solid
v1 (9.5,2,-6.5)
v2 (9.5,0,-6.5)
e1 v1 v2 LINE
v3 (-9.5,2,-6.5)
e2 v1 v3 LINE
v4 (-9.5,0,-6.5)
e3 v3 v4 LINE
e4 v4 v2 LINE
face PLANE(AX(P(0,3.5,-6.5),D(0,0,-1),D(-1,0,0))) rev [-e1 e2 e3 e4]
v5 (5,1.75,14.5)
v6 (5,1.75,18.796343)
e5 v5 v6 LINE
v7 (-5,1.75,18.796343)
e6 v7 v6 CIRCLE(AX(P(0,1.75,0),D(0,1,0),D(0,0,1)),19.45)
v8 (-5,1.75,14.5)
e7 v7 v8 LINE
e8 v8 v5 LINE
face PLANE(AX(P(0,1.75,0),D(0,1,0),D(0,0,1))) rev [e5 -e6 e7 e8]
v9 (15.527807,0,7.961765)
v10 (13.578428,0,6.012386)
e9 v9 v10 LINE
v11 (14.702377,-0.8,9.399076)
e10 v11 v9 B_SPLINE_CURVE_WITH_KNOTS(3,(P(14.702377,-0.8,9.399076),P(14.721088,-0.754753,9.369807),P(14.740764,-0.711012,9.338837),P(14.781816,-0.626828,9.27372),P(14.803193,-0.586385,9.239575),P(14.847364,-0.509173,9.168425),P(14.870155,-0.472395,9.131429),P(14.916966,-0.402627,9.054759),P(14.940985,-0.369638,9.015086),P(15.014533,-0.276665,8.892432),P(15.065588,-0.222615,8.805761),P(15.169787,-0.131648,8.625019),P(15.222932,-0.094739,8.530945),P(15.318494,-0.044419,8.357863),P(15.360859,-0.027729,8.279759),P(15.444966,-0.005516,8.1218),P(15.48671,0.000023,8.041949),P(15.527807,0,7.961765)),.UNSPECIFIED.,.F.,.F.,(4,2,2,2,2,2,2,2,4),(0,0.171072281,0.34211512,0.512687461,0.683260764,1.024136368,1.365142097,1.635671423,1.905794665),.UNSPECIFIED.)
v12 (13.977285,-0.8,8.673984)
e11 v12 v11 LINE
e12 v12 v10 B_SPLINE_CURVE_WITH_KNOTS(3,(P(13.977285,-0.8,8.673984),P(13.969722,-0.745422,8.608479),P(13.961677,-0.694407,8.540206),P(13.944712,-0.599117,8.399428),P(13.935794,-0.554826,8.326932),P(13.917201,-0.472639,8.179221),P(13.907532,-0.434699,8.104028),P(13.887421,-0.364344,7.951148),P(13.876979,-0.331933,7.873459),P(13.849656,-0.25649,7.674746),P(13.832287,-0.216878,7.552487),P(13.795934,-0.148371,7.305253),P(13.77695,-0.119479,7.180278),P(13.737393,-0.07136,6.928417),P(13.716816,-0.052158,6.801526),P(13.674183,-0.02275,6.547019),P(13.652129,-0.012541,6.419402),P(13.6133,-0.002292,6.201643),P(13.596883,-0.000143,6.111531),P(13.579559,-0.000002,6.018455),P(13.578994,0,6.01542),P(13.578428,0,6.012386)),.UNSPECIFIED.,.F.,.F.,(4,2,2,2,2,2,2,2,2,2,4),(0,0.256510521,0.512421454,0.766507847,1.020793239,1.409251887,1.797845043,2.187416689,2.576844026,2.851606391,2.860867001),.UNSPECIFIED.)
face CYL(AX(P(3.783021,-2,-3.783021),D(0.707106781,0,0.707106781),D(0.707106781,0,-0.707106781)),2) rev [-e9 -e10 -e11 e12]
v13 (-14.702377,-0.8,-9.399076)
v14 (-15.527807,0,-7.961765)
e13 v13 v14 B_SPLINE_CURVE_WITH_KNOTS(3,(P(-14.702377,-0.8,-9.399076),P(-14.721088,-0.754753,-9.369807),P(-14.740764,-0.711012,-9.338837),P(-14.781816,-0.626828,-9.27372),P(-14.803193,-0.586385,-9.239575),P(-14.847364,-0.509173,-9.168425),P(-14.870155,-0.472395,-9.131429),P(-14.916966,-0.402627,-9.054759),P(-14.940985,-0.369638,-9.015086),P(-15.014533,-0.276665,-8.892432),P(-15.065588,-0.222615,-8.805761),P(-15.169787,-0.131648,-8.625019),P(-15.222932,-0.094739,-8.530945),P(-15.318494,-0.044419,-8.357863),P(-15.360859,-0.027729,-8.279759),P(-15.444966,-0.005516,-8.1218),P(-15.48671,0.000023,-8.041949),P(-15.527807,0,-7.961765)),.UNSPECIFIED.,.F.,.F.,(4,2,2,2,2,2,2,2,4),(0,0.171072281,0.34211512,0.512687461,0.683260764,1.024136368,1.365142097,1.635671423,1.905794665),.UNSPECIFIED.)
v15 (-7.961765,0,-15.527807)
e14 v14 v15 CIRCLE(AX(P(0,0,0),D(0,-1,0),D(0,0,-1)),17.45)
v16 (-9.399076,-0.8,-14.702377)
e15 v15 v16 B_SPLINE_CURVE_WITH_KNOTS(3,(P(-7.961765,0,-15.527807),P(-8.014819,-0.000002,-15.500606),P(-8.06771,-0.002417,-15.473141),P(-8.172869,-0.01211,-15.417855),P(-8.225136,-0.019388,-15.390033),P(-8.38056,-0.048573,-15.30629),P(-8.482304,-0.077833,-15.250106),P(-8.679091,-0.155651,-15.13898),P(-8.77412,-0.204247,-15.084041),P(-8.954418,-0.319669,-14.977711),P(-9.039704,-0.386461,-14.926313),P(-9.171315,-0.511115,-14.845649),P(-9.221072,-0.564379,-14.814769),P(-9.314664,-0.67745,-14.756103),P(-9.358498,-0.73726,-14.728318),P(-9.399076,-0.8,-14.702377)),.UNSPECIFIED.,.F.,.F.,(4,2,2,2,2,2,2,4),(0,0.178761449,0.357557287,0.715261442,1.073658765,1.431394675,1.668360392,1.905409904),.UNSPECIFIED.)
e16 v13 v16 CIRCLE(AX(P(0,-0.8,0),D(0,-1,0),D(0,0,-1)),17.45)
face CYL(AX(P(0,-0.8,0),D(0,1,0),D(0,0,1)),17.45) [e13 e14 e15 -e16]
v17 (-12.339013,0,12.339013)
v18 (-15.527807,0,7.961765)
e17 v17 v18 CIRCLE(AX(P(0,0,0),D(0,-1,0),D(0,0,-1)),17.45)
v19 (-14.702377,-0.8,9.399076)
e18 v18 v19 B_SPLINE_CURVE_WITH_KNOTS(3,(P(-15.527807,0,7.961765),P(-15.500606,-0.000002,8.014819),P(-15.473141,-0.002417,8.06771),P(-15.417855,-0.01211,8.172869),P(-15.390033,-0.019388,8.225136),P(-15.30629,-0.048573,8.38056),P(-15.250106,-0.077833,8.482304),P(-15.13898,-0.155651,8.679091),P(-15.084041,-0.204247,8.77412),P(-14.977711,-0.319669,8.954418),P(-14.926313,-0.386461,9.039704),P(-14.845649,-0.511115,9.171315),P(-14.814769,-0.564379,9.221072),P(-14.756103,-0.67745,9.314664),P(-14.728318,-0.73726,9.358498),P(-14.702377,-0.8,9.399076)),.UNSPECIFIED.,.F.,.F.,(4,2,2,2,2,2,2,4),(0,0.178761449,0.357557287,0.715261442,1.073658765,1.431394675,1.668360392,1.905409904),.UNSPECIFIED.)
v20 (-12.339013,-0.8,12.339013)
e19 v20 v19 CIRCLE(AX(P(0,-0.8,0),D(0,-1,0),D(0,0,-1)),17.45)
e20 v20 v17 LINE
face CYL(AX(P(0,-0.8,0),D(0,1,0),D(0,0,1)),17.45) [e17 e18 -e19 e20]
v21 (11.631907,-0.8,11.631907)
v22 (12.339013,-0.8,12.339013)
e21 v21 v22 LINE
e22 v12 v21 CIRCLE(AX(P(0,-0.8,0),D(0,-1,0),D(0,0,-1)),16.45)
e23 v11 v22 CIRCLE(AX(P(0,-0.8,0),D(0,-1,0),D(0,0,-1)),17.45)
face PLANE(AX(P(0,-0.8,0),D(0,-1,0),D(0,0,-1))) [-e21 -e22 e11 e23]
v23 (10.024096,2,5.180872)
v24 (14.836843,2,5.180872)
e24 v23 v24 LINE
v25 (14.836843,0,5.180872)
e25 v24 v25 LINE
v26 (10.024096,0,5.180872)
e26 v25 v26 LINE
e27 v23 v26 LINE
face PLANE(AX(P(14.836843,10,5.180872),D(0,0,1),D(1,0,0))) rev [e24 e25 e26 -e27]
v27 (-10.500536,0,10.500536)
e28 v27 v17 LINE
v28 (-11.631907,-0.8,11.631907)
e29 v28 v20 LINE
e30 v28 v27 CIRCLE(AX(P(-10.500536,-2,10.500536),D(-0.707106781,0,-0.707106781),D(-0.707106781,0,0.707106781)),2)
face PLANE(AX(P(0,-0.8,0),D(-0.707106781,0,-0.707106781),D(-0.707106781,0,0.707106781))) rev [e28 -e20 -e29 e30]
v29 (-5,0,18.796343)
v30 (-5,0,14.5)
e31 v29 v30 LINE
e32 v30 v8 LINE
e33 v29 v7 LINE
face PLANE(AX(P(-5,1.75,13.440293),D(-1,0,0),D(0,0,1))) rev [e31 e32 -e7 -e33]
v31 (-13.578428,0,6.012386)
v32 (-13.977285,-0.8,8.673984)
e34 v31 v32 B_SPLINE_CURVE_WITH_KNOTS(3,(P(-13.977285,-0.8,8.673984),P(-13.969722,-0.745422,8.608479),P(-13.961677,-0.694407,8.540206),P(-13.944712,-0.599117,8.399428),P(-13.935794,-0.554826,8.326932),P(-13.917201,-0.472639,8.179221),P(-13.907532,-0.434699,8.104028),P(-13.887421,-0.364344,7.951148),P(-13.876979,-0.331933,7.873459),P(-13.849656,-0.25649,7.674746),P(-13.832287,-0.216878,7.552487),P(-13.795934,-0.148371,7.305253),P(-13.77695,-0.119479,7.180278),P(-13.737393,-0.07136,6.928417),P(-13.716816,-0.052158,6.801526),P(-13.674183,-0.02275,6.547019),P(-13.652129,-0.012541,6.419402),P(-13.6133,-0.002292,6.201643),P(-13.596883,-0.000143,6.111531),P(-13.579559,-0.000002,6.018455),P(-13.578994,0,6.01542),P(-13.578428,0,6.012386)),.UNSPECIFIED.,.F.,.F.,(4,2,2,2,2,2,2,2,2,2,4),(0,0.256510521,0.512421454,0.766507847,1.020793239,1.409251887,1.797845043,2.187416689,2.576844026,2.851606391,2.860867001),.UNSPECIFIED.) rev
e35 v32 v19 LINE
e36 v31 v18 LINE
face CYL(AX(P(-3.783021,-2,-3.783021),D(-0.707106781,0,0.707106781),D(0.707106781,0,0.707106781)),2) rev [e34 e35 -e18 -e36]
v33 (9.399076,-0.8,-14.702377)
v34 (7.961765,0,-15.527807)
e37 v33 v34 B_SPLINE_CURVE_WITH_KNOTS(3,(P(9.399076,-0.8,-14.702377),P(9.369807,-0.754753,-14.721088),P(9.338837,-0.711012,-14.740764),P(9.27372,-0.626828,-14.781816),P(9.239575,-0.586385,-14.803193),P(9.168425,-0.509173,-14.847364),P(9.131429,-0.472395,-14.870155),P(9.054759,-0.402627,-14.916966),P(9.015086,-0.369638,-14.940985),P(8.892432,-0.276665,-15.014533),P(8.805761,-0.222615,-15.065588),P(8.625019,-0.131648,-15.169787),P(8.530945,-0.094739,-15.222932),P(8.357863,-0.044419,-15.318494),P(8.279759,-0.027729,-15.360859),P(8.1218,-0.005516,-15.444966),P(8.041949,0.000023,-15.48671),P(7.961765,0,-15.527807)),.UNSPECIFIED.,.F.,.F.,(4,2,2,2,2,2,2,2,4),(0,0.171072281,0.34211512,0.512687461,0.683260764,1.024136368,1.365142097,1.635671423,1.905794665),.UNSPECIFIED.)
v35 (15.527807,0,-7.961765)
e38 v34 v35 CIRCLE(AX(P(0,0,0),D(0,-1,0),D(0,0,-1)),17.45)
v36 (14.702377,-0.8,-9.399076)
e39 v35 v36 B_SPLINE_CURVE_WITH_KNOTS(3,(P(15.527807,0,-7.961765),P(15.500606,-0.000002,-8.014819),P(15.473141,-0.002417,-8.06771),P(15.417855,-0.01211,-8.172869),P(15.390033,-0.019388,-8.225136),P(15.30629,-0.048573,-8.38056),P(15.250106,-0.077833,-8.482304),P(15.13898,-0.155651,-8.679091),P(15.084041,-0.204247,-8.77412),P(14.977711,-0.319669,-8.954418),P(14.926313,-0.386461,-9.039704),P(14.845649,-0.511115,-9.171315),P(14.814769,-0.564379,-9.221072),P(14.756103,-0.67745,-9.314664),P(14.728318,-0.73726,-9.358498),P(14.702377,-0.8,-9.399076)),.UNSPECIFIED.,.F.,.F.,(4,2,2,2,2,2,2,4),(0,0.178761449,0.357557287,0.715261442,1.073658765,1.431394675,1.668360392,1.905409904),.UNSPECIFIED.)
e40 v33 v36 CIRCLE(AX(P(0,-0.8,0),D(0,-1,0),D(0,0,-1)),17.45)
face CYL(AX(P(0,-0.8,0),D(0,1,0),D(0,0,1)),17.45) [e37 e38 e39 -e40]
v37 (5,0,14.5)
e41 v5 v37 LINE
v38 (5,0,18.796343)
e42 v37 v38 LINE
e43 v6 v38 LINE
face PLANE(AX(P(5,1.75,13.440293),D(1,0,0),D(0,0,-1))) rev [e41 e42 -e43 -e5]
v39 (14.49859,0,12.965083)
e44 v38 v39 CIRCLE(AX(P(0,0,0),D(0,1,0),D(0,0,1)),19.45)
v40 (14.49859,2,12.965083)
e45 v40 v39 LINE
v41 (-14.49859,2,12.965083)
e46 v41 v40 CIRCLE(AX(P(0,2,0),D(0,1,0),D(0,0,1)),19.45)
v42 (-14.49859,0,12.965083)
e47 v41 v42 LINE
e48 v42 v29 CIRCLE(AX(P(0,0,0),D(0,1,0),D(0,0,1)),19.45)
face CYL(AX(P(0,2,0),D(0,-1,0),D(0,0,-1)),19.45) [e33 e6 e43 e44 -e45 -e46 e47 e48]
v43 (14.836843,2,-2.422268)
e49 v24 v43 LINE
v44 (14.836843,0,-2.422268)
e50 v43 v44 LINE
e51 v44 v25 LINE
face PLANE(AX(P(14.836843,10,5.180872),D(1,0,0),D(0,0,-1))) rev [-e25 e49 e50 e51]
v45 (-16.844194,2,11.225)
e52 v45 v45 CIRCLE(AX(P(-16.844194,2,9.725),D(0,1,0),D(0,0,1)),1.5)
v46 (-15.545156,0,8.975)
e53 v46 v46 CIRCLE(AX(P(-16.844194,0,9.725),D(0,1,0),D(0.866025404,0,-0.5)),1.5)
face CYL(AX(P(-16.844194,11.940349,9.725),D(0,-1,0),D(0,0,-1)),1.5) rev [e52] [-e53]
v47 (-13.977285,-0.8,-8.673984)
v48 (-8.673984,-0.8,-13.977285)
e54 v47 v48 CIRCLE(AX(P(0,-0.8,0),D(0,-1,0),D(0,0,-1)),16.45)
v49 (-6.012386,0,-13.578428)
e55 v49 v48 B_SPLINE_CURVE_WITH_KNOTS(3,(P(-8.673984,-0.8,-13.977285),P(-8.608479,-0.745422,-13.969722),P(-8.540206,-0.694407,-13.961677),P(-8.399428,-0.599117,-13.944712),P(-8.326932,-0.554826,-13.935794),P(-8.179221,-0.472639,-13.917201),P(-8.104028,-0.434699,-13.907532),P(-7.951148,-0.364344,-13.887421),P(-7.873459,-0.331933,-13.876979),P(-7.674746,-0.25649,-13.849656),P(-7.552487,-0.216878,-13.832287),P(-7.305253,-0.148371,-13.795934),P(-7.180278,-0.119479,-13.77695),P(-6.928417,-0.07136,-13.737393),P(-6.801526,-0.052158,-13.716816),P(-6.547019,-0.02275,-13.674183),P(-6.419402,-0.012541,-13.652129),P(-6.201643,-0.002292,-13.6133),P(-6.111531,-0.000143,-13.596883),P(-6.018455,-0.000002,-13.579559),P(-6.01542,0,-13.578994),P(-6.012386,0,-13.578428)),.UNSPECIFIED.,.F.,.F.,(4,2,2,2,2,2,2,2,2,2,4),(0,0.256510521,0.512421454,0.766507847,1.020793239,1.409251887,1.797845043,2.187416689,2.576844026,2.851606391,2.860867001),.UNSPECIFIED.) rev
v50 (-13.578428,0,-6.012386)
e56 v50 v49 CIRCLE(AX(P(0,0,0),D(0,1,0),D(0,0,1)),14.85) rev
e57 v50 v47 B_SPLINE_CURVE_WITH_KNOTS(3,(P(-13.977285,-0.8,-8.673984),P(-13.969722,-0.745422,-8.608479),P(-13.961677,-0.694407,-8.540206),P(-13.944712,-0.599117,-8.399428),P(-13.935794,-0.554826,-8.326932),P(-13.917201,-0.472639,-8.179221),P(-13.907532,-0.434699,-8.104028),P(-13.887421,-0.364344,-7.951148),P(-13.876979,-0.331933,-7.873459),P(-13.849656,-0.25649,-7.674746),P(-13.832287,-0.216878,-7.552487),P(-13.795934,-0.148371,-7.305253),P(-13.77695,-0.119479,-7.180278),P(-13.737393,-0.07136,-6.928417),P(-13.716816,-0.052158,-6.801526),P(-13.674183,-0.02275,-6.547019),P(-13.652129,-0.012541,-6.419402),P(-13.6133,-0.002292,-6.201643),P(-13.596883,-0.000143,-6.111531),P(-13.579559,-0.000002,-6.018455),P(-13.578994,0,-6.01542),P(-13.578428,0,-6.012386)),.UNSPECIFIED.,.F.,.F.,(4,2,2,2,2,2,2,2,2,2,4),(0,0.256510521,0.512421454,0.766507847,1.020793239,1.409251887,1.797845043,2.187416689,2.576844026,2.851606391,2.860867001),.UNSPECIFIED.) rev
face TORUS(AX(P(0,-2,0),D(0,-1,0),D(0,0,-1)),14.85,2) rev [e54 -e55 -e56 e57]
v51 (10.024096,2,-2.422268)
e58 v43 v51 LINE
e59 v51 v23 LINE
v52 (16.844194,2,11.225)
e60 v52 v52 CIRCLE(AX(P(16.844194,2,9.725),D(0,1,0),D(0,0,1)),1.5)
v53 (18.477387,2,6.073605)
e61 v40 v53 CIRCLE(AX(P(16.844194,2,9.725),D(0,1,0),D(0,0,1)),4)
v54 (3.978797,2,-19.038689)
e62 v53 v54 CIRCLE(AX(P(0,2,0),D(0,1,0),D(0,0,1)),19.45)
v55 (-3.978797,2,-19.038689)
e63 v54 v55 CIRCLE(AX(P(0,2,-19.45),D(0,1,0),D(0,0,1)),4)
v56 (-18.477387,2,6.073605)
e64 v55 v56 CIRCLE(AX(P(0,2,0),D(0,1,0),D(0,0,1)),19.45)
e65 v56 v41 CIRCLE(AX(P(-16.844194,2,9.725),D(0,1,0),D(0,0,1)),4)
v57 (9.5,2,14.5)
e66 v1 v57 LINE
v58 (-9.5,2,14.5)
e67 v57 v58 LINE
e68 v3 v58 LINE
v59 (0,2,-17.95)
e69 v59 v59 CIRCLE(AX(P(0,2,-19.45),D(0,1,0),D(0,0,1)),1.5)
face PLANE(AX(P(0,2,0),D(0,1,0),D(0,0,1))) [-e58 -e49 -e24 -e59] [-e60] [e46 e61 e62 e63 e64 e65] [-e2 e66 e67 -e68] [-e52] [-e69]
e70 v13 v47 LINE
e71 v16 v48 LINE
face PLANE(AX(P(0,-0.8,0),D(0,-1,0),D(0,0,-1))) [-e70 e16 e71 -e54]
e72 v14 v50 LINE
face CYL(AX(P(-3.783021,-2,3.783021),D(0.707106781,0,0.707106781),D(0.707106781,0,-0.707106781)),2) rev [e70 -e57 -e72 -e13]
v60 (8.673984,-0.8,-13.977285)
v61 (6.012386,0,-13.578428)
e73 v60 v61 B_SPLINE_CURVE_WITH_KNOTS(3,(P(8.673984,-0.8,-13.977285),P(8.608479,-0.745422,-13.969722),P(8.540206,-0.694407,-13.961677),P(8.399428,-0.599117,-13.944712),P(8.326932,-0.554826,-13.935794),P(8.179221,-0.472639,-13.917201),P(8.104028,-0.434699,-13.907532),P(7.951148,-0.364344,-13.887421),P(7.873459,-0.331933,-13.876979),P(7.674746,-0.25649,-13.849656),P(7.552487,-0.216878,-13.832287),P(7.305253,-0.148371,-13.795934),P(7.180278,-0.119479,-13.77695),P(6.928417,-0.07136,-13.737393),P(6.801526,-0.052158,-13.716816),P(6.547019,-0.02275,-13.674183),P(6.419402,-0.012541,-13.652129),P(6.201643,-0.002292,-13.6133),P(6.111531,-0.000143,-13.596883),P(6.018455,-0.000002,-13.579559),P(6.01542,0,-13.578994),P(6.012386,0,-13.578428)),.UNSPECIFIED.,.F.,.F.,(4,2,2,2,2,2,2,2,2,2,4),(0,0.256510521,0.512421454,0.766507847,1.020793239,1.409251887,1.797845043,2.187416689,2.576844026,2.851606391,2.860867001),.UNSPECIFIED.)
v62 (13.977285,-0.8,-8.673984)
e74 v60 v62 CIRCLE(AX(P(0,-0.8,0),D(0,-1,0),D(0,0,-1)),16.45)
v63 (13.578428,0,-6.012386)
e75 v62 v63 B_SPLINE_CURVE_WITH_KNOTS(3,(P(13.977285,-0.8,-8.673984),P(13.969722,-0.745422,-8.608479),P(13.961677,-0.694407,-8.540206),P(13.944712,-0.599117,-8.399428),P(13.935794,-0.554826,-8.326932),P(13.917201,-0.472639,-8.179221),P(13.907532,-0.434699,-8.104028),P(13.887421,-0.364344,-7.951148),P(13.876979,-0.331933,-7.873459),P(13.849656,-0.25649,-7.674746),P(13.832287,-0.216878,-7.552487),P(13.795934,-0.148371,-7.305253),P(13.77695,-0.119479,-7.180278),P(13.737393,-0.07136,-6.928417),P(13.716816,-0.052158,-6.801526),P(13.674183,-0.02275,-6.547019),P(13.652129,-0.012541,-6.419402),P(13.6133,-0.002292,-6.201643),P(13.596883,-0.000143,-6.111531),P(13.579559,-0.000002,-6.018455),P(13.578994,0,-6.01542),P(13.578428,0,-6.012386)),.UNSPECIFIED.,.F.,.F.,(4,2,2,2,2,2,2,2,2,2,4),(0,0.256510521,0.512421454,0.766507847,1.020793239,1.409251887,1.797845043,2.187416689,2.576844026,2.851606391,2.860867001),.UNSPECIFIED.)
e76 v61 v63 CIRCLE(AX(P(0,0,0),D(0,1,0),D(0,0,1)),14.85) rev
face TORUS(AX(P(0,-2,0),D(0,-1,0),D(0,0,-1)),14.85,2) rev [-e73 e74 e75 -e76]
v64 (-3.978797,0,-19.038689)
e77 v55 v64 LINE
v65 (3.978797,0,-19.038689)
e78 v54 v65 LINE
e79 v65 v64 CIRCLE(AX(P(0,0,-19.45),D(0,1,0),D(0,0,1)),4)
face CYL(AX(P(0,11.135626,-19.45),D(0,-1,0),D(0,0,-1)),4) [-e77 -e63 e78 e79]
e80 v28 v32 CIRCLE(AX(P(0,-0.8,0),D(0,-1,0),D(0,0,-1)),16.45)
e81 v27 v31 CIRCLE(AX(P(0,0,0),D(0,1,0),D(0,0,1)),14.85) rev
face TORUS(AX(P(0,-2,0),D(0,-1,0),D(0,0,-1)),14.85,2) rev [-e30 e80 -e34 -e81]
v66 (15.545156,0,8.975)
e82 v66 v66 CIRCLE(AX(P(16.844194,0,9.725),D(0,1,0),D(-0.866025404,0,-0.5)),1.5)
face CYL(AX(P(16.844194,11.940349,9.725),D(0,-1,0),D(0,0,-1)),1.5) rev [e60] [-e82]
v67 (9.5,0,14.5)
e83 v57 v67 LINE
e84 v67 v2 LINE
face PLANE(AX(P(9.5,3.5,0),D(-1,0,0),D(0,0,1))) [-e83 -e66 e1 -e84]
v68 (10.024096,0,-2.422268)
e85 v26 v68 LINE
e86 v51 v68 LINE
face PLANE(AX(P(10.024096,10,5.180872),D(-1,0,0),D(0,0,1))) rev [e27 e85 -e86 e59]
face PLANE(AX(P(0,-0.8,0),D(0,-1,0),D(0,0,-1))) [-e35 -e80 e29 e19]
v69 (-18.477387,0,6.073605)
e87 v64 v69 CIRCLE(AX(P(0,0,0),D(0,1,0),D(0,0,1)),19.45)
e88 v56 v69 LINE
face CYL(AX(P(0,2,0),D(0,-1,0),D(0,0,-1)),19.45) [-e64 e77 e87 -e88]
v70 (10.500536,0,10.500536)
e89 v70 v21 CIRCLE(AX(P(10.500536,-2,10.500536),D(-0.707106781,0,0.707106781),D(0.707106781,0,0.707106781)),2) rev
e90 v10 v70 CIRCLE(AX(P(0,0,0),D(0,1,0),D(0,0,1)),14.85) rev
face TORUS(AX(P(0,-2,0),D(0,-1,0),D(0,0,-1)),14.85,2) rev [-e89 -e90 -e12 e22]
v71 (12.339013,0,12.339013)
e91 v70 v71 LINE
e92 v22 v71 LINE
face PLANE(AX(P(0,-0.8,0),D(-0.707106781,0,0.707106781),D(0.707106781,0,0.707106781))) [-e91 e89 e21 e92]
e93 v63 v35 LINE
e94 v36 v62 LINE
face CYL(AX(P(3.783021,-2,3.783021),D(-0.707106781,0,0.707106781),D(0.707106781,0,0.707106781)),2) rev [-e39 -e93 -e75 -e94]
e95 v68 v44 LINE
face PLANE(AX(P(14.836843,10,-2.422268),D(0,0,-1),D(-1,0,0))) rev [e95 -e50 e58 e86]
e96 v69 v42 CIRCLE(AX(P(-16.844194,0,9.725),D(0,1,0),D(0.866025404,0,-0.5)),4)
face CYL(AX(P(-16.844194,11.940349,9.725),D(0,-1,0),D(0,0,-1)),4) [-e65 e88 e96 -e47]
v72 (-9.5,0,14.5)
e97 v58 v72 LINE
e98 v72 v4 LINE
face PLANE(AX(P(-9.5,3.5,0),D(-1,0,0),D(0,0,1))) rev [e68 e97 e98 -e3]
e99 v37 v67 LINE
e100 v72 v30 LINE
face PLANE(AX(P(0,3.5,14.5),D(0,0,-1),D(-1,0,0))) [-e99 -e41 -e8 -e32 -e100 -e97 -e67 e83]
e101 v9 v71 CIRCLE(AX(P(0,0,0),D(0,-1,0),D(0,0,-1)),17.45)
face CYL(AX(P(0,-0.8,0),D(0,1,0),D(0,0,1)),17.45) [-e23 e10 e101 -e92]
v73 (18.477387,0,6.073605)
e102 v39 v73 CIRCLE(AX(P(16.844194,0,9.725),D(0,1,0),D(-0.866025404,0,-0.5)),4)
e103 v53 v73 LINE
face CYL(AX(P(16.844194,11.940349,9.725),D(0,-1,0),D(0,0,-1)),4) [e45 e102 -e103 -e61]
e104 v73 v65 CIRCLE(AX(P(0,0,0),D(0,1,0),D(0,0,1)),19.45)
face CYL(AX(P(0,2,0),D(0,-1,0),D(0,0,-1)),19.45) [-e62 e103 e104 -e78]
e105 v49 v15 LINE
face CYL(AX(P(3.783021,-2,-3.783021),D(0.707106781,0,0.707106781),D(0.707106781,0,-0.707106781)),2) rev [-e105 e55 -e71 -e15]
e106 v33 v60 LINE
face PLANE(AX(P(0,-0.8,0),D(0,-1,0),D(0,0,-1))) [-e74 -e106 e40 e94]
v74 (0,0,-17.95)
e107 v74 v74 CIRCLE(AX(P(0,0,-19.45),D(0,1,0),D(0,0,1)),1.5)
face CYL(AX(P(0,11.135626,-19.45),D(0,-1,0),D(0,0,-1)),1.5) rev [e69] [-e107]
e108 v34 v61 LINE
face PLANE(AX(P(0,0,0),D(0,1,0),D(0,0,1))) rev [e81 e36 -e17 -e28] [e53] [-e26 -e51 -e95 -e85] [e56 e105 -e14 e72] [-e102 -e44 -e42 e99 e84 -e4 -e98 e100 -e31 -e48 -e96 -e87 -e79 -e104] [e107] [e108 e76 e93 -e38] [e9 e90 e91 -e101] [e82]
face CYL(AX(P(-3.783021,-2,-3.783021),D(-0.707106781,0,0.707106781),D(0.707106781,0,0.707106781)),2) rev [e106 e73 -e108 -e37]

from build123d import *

# Parameters (mm, degrees)
ESQUISSE2_R                    = 19.45
BOSS_EXTRU_1_DEPTH             = 2
ESQUISSE2_3_R                  = 19.45
ESQUISSE2_3_R_2                = 4
ESQUISSE2_3_R_3                = 1.5
BOSS_EXTRU_2_DEPTH             = 2
ENL_V_MAT_EXTRU_2_DEPTH        = 2
R_P_TITION_CIRCULAIRE1_DEPTH   = 2
R_P_TITION_CIRCULAIRE1_2_DEPTH = 2
BOSS_EXTRU_3_DEPTH             = 0.8
CONG_1_R                       = 2
ESQUISSE6_W                    = 4.812747309
ESQUISSE6_H                    = 7.603139871
ENL_V_MAT_EXTRU_3_DEPTH        = 10
ESQUISSE7_W                    = 19
ESQUISSE7_H                    = 21
ENL_V_MAT_EXTRU_4_DEPTH        = 3.5
ESQUISSE8_W                    = 10
ESQUISSE8_H                    = 6.246978905
ENL_V_MAT_EXTRU_5_DEPTH        = 1.75


# Read off the part's stored shape, not the designer's step: Répétition circulaire1
with BuildPart() as part:
    # Esquisse2 → Boss.-Extru.1 (new body)
    with BuildSketch(Plane(origin=(0, 0, 0), x_dir=(1, 0, 0), z_dir=(0, 1, 0))):
        with Locations(Location((0, 0, 0), (0, 0, 270))):
            Circle(ESQUISSE2_R)
    extrude(amount=BOSS_EXTRU_1_DEPTH)

    # Esquisse2<3> → Boss.-Extru.2 (add)
    # profile 1 of 2: a face of its own
    with BuildSketch(Plane(origin=(0, 0, 0), x_dir=(1, 0, 0), z_dir=(0, 1, 0))):
        Circle(ESQUISSE2_3_R)
    # profile 2 of 2: a face of its own
    with BuildSketch(Plane(origin=(0, 0, 0), x_dir=(1, 0, 0), z_dir=(0, 1, 0))):
        with Locations((0, 19.45)):
            Circle(ESQUISSE2_3_R_2)
        with Locations((0, 19.45)):
            Circle(ESQUISSE2_3_R_3, mode=Mode.SUBTRACT)
    extrude(amount=BOSS_EXTRU_2_DEPTH)

    # Esquisse2<4> → Enlèv. mat.-Extru.2 (cut)
    with BuildSketch(Plane(origin=(0, 0, 0), x_dir=(1, 0, 0), z_dir=(0, 1, 0))):
        with BuildLine():
            ThreePointArc((1.498884406, 19.392159383), (0.75, 19.435534467), (0, 19.45))
            Line((0, 19.45), (0, 17.95))
            ThreePointArc((0, 17.95), (1.040009393, 18.369083508), (1.498884406, 19.392159383))
        make_face()
        with BuildLine():
            Line((0, 17.95), (0, 19.45))
            ThreePointArc((0, 19.45), (-0.75, 19.435534467), (-1.498884406, 19.392159383))
            ThreePointArc((-1.498884406, 19.392159383), (-1.040009393, 18.369083508), (0, 17.95))
        make_face()
    extrude(amount=ENL_V_MAT_EXTRU_2_DEPTH, mode=Mode.SUBTRACT)

    # Répétition circulaire1 outline → Répétition circulaire1 (cut)
    with BuildSketch(Plane(origin=(0, 0, 0), x_dir=(1, 0, 0), z_dir=(0, 1, 0))):
        with BuildLine():
            ThreePointArc((16.044660457, -10.994151664), (16.844194104, -9.725), (17.543544863, -8.398007718))
            ThreePointArc((17.543544863, -8.398007718), (15.545155998, -8.975), (16.044660457, -10.994151664))
        make_face()
        with BuildLine():
            ThreePointArc((-17.543544863, -8.398007718), (-16.844194104, -9.725), (-16.044660457, -10.994151664))
            ThreePointArc((-16.044660457, -10.994151664), (-15.545155998, -8.975), (-17.543544863, -8.398007718))
        make_face()
    extrude(amount=R_P_TITION_CIRCULAIRE1_DEPTH, mode=Mode.SUBTRACT)

    # R_p_tition circulaire1 2 outline → R_p_tition circulaire1 2 (add)
    with BuildSketch(Plane(origin=(0, 0, 0), x_dir=(1, 0, 0), z_dir=(0, 1, 0))):
        with BuildLine():
            ThreePointArc((17.543544863, -8.398007718), (18.14323221, -10.475), (16.044660457, -10.994151664))
            ThreePointArc((16.044660457, -10.994151664), (15.303387831, -12.004533347), (14.49858993, -12.965083496))
            ThreePointArc((14.49858993, -12.965083496), (20.308295719, -11.725), (18.477386634, -6.07360545))
            ThreePointArc((18.477386634, -6.07360545), (18.047924755, -7.250855952), (17.543544863, -8.398007718))
        make_face()
        with BuildLine():
            ThreePointArc((-18.477386634, -6.07360545), (-20.308295719, -11.725), (-14.49858993, -12.965083496))
            ThreePointArc((-14.49858993, -12.965083496), (-15.303387831, -12.004533347), (-16.044660457, -10.994151664))
            ThreePointArc((-16.044660457, -10.994151664), (-18.14323221, -10.475), (-17.543544863, -8.398007718))
            ThreePointArc((-17.543544863, -8.398007718), (-18.047924755, -7.250855952), (-18.477386634, -6.07360545))
        make_face()
    extrude(amount=R_P_TITION_CIRCULAIRE1_2_DEPTH)

    # Esquisse5 → Boss.-Extru.3 (add)
    with BuildSketch(Plane.XZ):
        with BuildLine():
            Line((8.673984211, -13.97728507), (9.39907569, -14.702376549))
            ThreePointArc((9.39907569, -14.702376549), (12.339013332, -12.339013332), (14.702376549, -9.39907569))
            Line((14.702376549, -9.39907569), (13.97728507, -8.673984211))
            ThreePointArc((13.97728507, -8.673984211), (11.631906551, -11.631906551), (8.673984211, -13.97728507))
        make_face()
        with BuildLine():
            ThreePointArc((-14.702376549, -9.39907569), (-12.339013332, -12.339013332), (-9.39907569, -14.702376549))
            Line((-9.39907569, -14.702376549), (-8.673984211, -13.97728507))
            ThreePointArc((-8.673984211, -13.97728507), (-11.631906551, -11.631906551), (-13.97728507, -8.673984211))
            Line((-13.97728507, -8.673984211), (-14.702376549, -9.39907569))
        make_face()
        with BuildLine():
            Line((13.97728507, 8.673984211), (14.702376549, 9.39907569))
            ThreePointArc((14.702376549, 9.39907569), (13.600367642, 10.933091969), (12.339013332, 12.339013332))
            Line((12.339013332, 12.339013332), (11.631906551, 11.631906551))
            ThreePointArc((11.631906551, 11.631906551), (12.88972459, 10.220445196), (13.97728507, 8.673984211))
        make_face()
        with BuildLine():
            ThreePointArc((-12.339013332, 12.339013332), (-13.600367642, 10.933091969), (-14.702376549, 9.39907569))
            Line((-14.702376549, 9.39907569), (-13.97728507, 8.673984211))
            ThreePointArc((-13.97728507, 8.673984211), (-12.88972459, 10.220445196), (-11.631906551, 11.631906551))
            Line((-11.631906551, 11.631906551), (-12.339013332, 12.339013332))
        make_face()
    extrude(amount=BOSS_EXTRU_3_DEPTH)

    # Congé1
    # the kernel refuses this fillet: 2 mm, written as the material it adds along each edge
    with BuildSketch(Plane(origin=(11.148857945, 0, 5.845557086), x_dir=(0.7071067811865459, 0, -0.7071067811865492), z_dir=(0.7071067811865492, 0, 0.7071067811865458))) as cong_1_piece_1_section:
        with BuildLine():
            CenterArc((1.6, -2), CONG_1_R, 90, 53.130102354)
            Line((0, -0.8), (-0.032, -0.776))
            ThreePointArc((-0.032, -0.776), (-0.04, -0.4), (-0.04, 0))
            Line((-0.04, 0), (0, 0.04))
            Line((0, 0.04), (1.6, 0.04))
            Line((1.6, 0.04), (1.6, 0))
        make_face()
    cong_1_piece_1 = extrude(amount=9.025434204, mode=Mode.PRIVATE)
    cong_1_piece_1 = cong_1_piece_1 & Plane(origin=(0, -0.204103776, 0), x_dir=(0.8425430686905786, 0, 0.5386289793554215), z_dir=(0, 1, 0)) * Cylinder(17.45, 25, mode=Mode.PRIVATE)
    cong_1_piece_1 = cong_1_piece_1 - Plane(origin=(0, -0.204103776, 0), x_dir=(0.7071067811865577, 0, 0.7071067811865375), z_dir=(0, 1, 0)) * Cylinder(16.45, 25, mode=Mode.PRIVATE)
    add(cong_1_piece_1)
    with BuildSketch(Plane(origin=(0, 0, 0), x_dir=(0.7071067811865576, 0, 0.7071067811865375), z_dir=(-0.7071067811865375, 0, 0.7071067811865576))) as cong_1_piece_2_section:
        with BuildLine():
            CenterArc((14.85, -2), CONG_1_R, 36.869897646, 53.130102354)
            Line((16.45, -0.8), (16.482, -0.776))
            ThreePointArc((16.482, -0.776), (16.49, -0.4), (16.49, 0))
            Line((16.49, 0), (16.45, 0.04))
            Line((16.45, 0.04), (14.85, 0.04))
            Line((14.85, 0.04), (14.85, 0))
        make_face()
    cong_1_piece_2 = revolve(axis=Axis((0, 0, 0), (0, 1, 0)), revolution_arc=27.109429972, mode=Mode.PRIVATE)
    cong_1_piece_2 = split(cong_1_piece_2, bisect_by=Plane(origin=(13.88723244, -0.204725798, 8.583931581), z_dir=(-0.7071067811865458, 0, 0.7071067811865492)), keep=Keep.TOP, mode=Mode.PRIVATE)
    add(cong_1_piece_2)
    with BuildSketch(Plane(origin=(0, 0, 0), x_dir=(-0.9516449769891426, 0, 0.30719999637261464), z_dir=(-0.30719999637261464, 0, -0.9516449769891426))) as cong_1_piece_3_section:
        with BuildLine():
            CenterArc((14.85, -2), CONG_1_R, 36.869897646, 53.130102354)
            Line((16.45, -0.8), (16.482, -0.776))
            ThreePointArc((16.482, -0.776), (16.49, -0.4), (16.49, 0))
            Line((16.49, 0), (16.45, 0.04))
            Line((16.45, 0.04), (14.85, 0.04))
            Line((14.85, 0.04), (14.85, 0))
        make_face()
    cong_1_piece_3 = revolve(axis=Axis((0, 0, 0), (0, 1, 0)), revolution_arc=27.109429972, mode=Mode.PRIVATE)
    cong_1_piece_3 = split(cong_1_piece_3, bisect_by=Plane(origin=(-13.887232342, -0.20472579, 8.583931483), z_dir=(0.7071067811865458, 0, 0.7071067811865493)), keep=Keep.TOP, mode=Mode.PRIVATE)
    add(cong_1_piece_3)
    with BuildSketch(Plane(origin=(-17.530803673, 0, 12.227502814), x_dir=(-0.7071067811865458, 0, -0.7071067811865493), z_dir=(0.7071067811865493, 0, -0.7071067811865458))) as cong_1_piece_4_section:
        with BuildLine():
            CenterArc((1.6, -2), CONG_1_R, 90, 53.130102354)
            Line((0, -0.8), (-0.032, -0.776))
            ThreePointArc((-0.032, -0.776), (-0.04, -0.4), (-0.04, 0))
            Line((-0.04, 0), (0, 0.04))
            Line((0, 0.04), (1.6, 0.04))
            Line((1.6, 0.04), (1.6, 0))
        make_face()
    cong_1_piece_4 = extrude(amount=9.025434204, mode=Mode.PRIVATE)
    cong_1_piece_4 = cong_1_piece_4 & Plane(origin=(0, -0.204103718, 0), x_dir=(-0.7071067811865558, 0, 0.7071067811865394), z_dir=(0, 1, 0)) * Cylinder(17.45, 25, mode=Mode.PRIVATE)
    cong_1_piece_4 = cong_1_piece_4 - Plane(origin=(0, -0.204103718, 0), x_dir=(-0.8496829829485655, 0, 0.527293872985101), z_dir=(0, 1, 0)) * Cylinder(16.45, 25, mode=Mode.PRIVATE)
    add(cong_1_piece_4)
    with BuildSketch(Plane(origin=(17.530803673, 0, -12.227502814), x_dir=(0.7071067811865459, 0, 0.7071067811865492), z_dir=(-0.7071067811865492, 0, 0.7071067811865458))) as cong_1_piece_5_section:
        with BuildLine():
            CenterArc((1.6, -2), CONG_1_R, 90, 53.130102354)
            Line((0, -0.8), (-0.032, -0.776))
            ThreePointArc((-0.032, -0.776), (-0.04, -0.4), (-0.04, 0))
            Line((-0.04, 0), (0, 0.04))
            Line((0, 0.04), (1.6, 0.04))
            Line((1.6, 0.04), (1.6, 0))
        make_face()
    cong_1_piece_5 = extrude(amount=9.025434204, mode=Mode.PRIVATE)
    cong_1_piece_5 = cong_1_piece_5 & Plane(origin=(0, -0.204103718, 0), x_dir=(0.5386289793554239, 0, -0.8425430686905769), z_dir=(0, 1, 0)) * Cylinder(17.45, 25, mode=Mode.PRIVATE)
    cong_1_piece_5 = cong_1_piece_5 - Plane(origin=(0, -0.204103718, 0), x_dir=(0.849682982948563, 0, -0.5272938729851051), z_dir=(0, 1, 0)) * Cylinder(16.45, 25, mode=Mode.PRIVATE)
    add(cong_1_piece_5)
    with BuildSketch(Plane(origin=(0, 0, 0), x_dir=(0.9516469062705674, 0, -0.30719401977521954), z_dir=(0.30719401977521954, 0, 0.9516469062705674))) as cong_1_piece_6_section:
        with BuildLine():
            CenterArc((14.85, -2), CONG_1_R, 36.869897646, 53.130102354)
            Line((16.45, -0.8), (16.482, -0.776))
            ThreePointArc((16.482, -0.776), (16.49, -0.4), (16.49, 0))
            Line((16.49, 0), (16.45, 0.04))
            Line((16.45, 0.04), (14.85, 0.04))
            Line((14.85, 0.04), (14.85, 0))
        make_face()
    cong_1_piece_6 = revolve(axis=Axis((0, 0, 0), (0, 1, 0)), revolution_arc=54.21957961, mode=Mode.PRIVATE)
    cong_1_piece_6 = split(cong_1_piece_6, bisect_by=Plane(origin=(8.583931605, -0.20472582, -13.887232464), z_dir=(0.7071067811865467, 0, 0.7071067811865485)), keep=Keep.TOP, mode=Mode.PRIVATE)
    cong_1_piece_6 = split(cong_1_piece_6, bisect_by=Plane(origin=(13.887232464, -0.20472582, -8.583931605), z_dir=(-0.7071067811865458, 0, -0.7071067811865492)), keep=Keep.TOP, mode=Mode.PRIVATE)
    add(cong_1_piece_6)
    with BuildSketch(Plane(origin=(5.845557086, 0, -11.148857945), x_dir=(-0.7071067811865465, 0, -0.7071067811865485), z_dir=(0.7071067811865485, 0, -0.7071067811865467))) as cong_1_piece_7_section:
        with BuildLine():
            CenterArc((1.6, -2), CONG_1_R, 90, 53.130102354)
            Line((0, -0.8), (-0.032, -0.776))
            ThreePointArc((-0.032, -0.776), (-0.04, -0.4), (-0.04, 0))
            Line((-0.04, 0), (0, 0.04))
            Line((0, 0.04), (1.6, 0.04))
            Line((1.6, 0.04), (1.6, 0))
        make_face()
    cong_1_piece_7 = extrude(amount=9.025434204, mode=Mode.PRIVATE)
    cong_1_piece_7 = cong_1_piece_7 & Plane(origin=(0, -0.204103776, 0), x_dir=(0.5386289793554239, 0, -0.8425430686905769), z_dir=(0, 1, 0)) * Cylinder(17.45, 25, mode=Mode.PRIVATE)
    cong_1_piece_7 = cong_1_piece_7 - Plane(origin=(0, -0.204103776, 0), x_dir=(0.849682982948563, 0, -0.5272938729851051), z_dir=(0, 1, 0)) * Cylinder(16.45, 25, mode=Mode.PRIVATE)
    add(cong_1_piece_7)
    with BuildSketch(Plane(origin=(-12.227502814, 0, -17.530803673), x_dir=(0.7071067811865467, 0, -0.7071067811865483), z_dir=(0.7071067811865485, 0, 0.7071067811865467))) as cong_1_piece_8_section:
        with BuildLine():
            CenterArc((1.6, -2), CONG_1_R, 90, 53.130102354)
            Line((0, -0.8), (-0.032, -0.776))
            ThreePointArc((-0.032, -0.776), (-0.04, -0.4), (-0.04, 0))
            Line((-0.04, 0), (0, 0.04))
            Line((0, 0.04), (1.6, 0.04))
            Line((1.6, 0.04), (1.6, 0))
        make_face()
    cong_1_piece_8 = extrude(amount=9.025434204, mode=Mode.PRIVATE)
    cong_1_piece_8 = cong_1_piece_8 & Plane(origin=(0, -0.204103718, 0), x_dir=(-0.8425430686905772, 0, -0.5386289793554238), z_dir=(0, 1, 0)) * Cylinder(17.45, 25, mode=Mode.PRIVATE)
    cong_1_piece_8 = cong_1_piece_8 - Plane(origin=(0, -0.204103718, 0), x_dir=(-0.5272938729851264, 0, -0.8496829829485496), z_dir=(0, 1, 0)) * Cylinder(16.45, 25, mode=Mode.PRIVATE)
    add(cong_1_piece_8)
    with BuildSketch(Plane(origin=(0, 0, 0), x_dir=(-0.30719401977524424, 0, -0.9516469062705595), z_dir=(0.9516469062705595, 0, -0.30719401977524424))) as cong_1_piece_9_section:
        with BuildLine():
            CenterArc((14.85, -2), CONG_1_R, 36.869897646, 53.130102354)
            Line((16.45, -0.8), (16.482, -0.776))
            ThreePointArc((16.482, -0.776), (16.49, -0.4), (16.49, 0))
            Line((16.49, 0), (16.45, 0.04))
            Line((16.45, 0.04), (14.85, 0.04))
            Line((14.85, 0.04), (14.85, 0))
        make_face()
    cong_1_piece_9 = revolve(axis=Axis((0, 0, 0), (0, 1, 0)), revolution_arc=54.21957961, mode=Mode.PRIVATE)
    cong_1_piece_9 = split(cong_1_piece_9, bisect_by=Plane(origin=(-8.583931605, -0.20472582, -13.887232464), z_dir=(-0.7071067811865467, 0, 0.7071067811865485)), keep=Keep.TOP, mode=Mode.PRIVATE)
    cong_1_piece_9 = split(cong_1_piece_9, bisect_by=Plane(origin=(-13.887232464, -0.20472582, -8.583931605), z_dir=(0.7071067811865458, 0, -0.7071067811865492)), keep=Keep.TOP, mode=Mode.PRIVATE)
    add(cong_1_piece_9)
    with BuildSketch(Plane(origin=(-11.148857945, 0, -5.845557086), x_dir=(-0.7071067811865459, 0, 0.7071067811865492), z_dir=(-0.7071067811865492, 0, -0.7071067811865458))) as cong_1_piece_10_section:
        with BuildLine():
            CenterArc((1.6, -2), CONG_1_R, 90, 53.130102354)
            Line((0, -0.8), (-0.032, -0.776))
            ThreePointArc((-0.032, -0.776), (-0.04, -0.4), (-0.04, 0))
            Line((-0.04, 0), (0, 0.04))
            Line((0, 0.04), (1.6, 0.04))
            Line((1.6, 0.04), (1.6, 0))
        make_face()
    cong_1_piece_10 = extrude(amount=9.025434204, mode=Mode.PRIVATE)
    cong_1_piece_10 = cong_1_piece_10 & Plane(origin=(0, -0.204103776, 0), x_dir=(-0.8425430686905772, 0, -0.5386289793554238), z_dir=(0, 1, 0)) * Cylinder(17.45, 25, mode=Mode.PRIVATE)
    cong_1_piece_10 = cong_1_piece_10 - Plane(origin=(0, -0.204103776, 0), x_dir=(-0.5272938729851264, 0, -0.8496829829485496), z_dir=(0, 1, 0)) * Cylinder(16.45, 25, mode=Mode.PRIVATE)
    add(cong_1_piece_10)
    with BuildSketch(Plane(origin=(11.148857945, 0, 5.845557086), x_dir=(0.7071067811865459, 0, -0.7071067811865492), z_dir=(0.7071067811865492, 0, 0.7071067811865458))) as cong_1_piece_11a_section:
        with BuildLine():
            CenterArc((1.6, -2), CONG_1_R, 90, 53.130102354)
            Line((0, -0.8), (-0.032, -0.776))
            ThreePointArc((-0.032, -0.776), (-0.04, -0.4), (-0.04, 0))
            Line((-0.04, 0), (0, 0.04))
            Line((0, 0.04), (1.6, 0.04))
            Line((1.6, 0.04), (1.6, 0))
        make_face()
    cong_1_piece_11a = extrude(amount=9.025434204, mode=Mode.PRIVATE)
    cong_1_piece_11a = cong_1_piece_11a & Plane(origin=(0, -0.207693111, 0), x_dir=(0.7071067811865577, 0, 0.7071067811865375), z_dir=(0, 1, 0)) * Cylinder(16.45, 25, mode=Mode.PRIVATE)
    with BuildSketch(Plane(origin=(0, 0, 0), x_dir=(0.7071067811865576, 0, 0.7071067811865375), z_dir=(-0.7071067811865375, 0, 0.7071067811865576))) as cong_1_piece_11b_section:
        with BuildLine():
            CenterArc((14.85, -2), CONG_1_R, 36.869897646, 53.130102354)
            Line((16.45, -0.8), (16.482, -0.776))
            ThreePointArc((16.482, -0.776), (16.49, -0.4), (16.49, 0))
            Line((16.49, 0), (16.45, 0.04))
            Line((16.45, 0.04), (14.85, 0.04))
            Line((14.85, 0.04), (14.85, 0))
        make_face()
    cong_1_piece_11b = revolve(axis=Axis((0, 0, 0), (0, 1, 0)), revolution_arc=27.109429972, mode=Mode.PRIVATE)
    cong_1_piece_11b = split(cong_1_piece_11b, bisect_by=Plane(origin=(13.273689354, -0.210053776, 7.970388495), z_dir=(0.7071067811865458, 0, -0.7071067811865492)), keep=Keep.TOP, mode=Mode.PRIVATE)
    cong_1_piece_11 = cong_1_piece_11a & cong_1_piece_11b
    add(cong_1_piece_11)
    with BuildSketch(Plane(origin=(0, 0, 0), x_dir=(-0.9516449769891426, 0, 0.30719999637261464), z_dir=(-0.30719999637261464, 0, -0.9516449769891426))) as cong_1_piece_12a_section:
        with BuildLine():
            CenterArc((14.85, -2), CONG_1_R, 36.869897646, 53.130102354)
            Line((16.45, -0.8), (16.482, -0.776))
            ThreePointArc((16.482, -0.776), (16.49, -0.4), (16.49, 0))
            Line((16.49, 0), (16.45, 0.04))
            Line((16.45, 0.04), (14.85, 0.04))
            Line((14.85, 0.04), (14.85, 0))
        make_face()
    cong_1_piece_12a = revolve(axis=Axis((0, 0, 0), (0, 1, 0)), revolution_arc=27.109429972, mode=Mode.PRIVATE)
    cong_1_piece_12a = split(cong_1_piece_12a, bisect_by=Plane(origin=(-13.273689161, -0.21005368, 7.970388302), z_dir=(-0.7071067811865458, 0, -0.7071067811865493)), keep=Keep.TOP, mode=Mode.PRIVATE)
    with BuildSketch(Plane(origin=(-17.530803673, 0, 12.227502814), x_dir=(-0.7071067811865458, 0, -0.7071067811865493), z_dir=(0.7071067811865493, 0, -0.7071067811865458))) as cong_1_piece_12b_section:
        with BuildLine():
            CenterArc((1.6, -2), CONG_1_R, 90, 53.130102354)
            Line((0, -0.8), (-0.032, -0.776))
            ThreePointArc((-0.032, -0.776), (-0.04, -0.4), (-0.04, 0))
            Line((-0.04, 0), (0, 0.04))
            Line((0, 0.04), (1.6, 0.04))
            Line((1.6, 0.04), (1.6, 0))
        make_face()
    cong_1_piece_12b = extrude(amount=9.025434204, mode=Mode.PRIVATE)
    cong_1_piece_12b = cong_1_piece_12b & Plane(origin=(0, -0.207693101, 0), x_dir=(-0.8496829829485655, 0, 0.527293872985101), z_dir=(0, 1, 0)) * Cylinder(16.45, 25, mode=Mode.PRIVATE)
    cong_1_piece_12 = cong_1_piece_12a & cong_1_piece_12b
    add(cong_1_piece_12)
    with BuildSketch(Plane(origin=(0, 0, 0), x_dir=(0.9516469062705674, 0, -0.30719401977521954), z_dir=(0.30719401977521954, 0, 0.9516469062705674))) as cong_1_piece_13a_section:
        with BuildLine():
            CenterArc((14.85, -2), CONG_1_R, 36.869897646, 53.130102354)
            Line((16.45, -0.8), (16.482, -0.776))
            ThreePointArc((16.482, -0.776), (16.49, -0.4), (16.49, 0))
            Line((16.49, 0), (16.45, 0.04))
            Line((16.45, 0.04), (14.85, 0.04))
            Line((14.85, 0.04), (14.85, 0))
        make_face()
    cong_1_piece_13a = revolve(axis=Axis((0, 0, 0), (0, 1, 0)), revolution_arc=54.21957961, mode=Mode.PRIVATE)
    cong_1_piece_13a = split(cong_1_piece_13a, bisect_by=Plane(origin=(13.27367534, -0.21005361, -7.970374481), z_dir=(0.7071067811865458, 0, 0.7071067811865492)), keep=Keep.TOP, mode=Mode.PRIVATE)
    with BuildSketch(Plane(origin=(17.530803673, 0, -12.227502814), x_dir=(0.7071067811865459, 0, 0.7071067811865492), z_dir=(-0.7071067811865492, 0, 0.7071067811865458))) as cong_1_piece_13b_section:
        with BuildLine():
            CenterArc((1.6, -2), CONG_1_R, 90, 53.130102354)
            Line((0, -0.8), (-0.032, -0.776))
            ThreePointArc((-0.032, -0.776), (-0.04, -0.4), (-0.04, 0))
            Line((-0.04, 0), (0, 0.04))
            Line((0, 0.04), (1.6, 0.04))
            Line((1.6, 0.04), (1.6, 0))
        make_face()
    cong_1_piece_13b = extrude(amount=9.025434204, mode=Mode.PRIVATE)
    cong_1_piece_13b = cong_1_piece_13b & Plane(origin=(0, -0.207693101, 0), x_dir=(0.849682982948563, 0, -0.5272938729851051), z_dir=(0, 1, 0)) * Cylinder(16.45, 25, mode=Mode.PRIVATE)
    cong_1_piece_13 = cong_1_piece_13a & cong_1_piece_13b
    add(cong_1_piece_13)
    with BuildSketch(Plane(origin=(5.845557086, 0, -11.148857945), x_dir=(-0.7071067811865465, 0, -0.7071067811865485), z_dir=(0.7071067811865485, 0, -0.7071067811865467))) as cong_1_piece_14a_section:
        with BuildLine():
            CenterArc((1.6, -2), CONG_1_R, 90, 53.130102354)
            Line((0, -0.8), (-0.032, -0.776))
            ThreePointArc((-0.032, -0.776), (-0.04, -0.4), (-0.04, 0))
            Line((-0.04, 0), (0, 0.04))
            Line((0, 0.04), (1.6, 0.04))
            Line((1.6, 0.04), (1.6, 0))
        make_face()
    cong_1_piece_14a = extrude(amount=9.025434204, mode=Mode.PRIVATE)
    cong_1_piece_14a = cong_1_piece_14a & Plane(origin=(0, -0.207693111, 0), x_dir=(0.849682982948563, 0, -0.5272938729851051), z_dir=(0, 1, 0)) * Cylinder(16.45, 25, mode=Mode.PRIVATE)
    with BuildSketch(Plane(origin=(0, 0, 0), x_dir=(0.9516469062705674, 0, -0.30719401977521954), z_dir=(0.30719401977521954, 0, 0.9516469062705674))) as cong_1_piece_14b_section:
        with BuildLine():
            CenterArc((14.85, -2), CONG_1_R, 36.869897646, 53.130102354)
            Line((16.45, -0.8), (16.482, -0.776))
            ThreePointArc((16.482, -0.776), (16.49, -0.4), (16.49, 0))
            Line((16.49, 0), (16.45, 0.04))
            Line((16.45, 0.04), (14.85, 0.04))
            Line((14.85, 0.04), (14.85, 0))
        make_face()
    cong_1_piece_14b = revolve(axis=Axis((0, 0, 0), (0, 1, 0)), revolution_arc=54.21957961, mode=Mode.PRIVATE)
    cong_1_piece_14b = split(cong_1_piece_14b, bisect_by=Plane(origin=(7.970374673, -0.210053705, -13.273675532), z_dir=(-0.7071067811865467, 0, -0.7071067811865485)), keep=Keep.TOP, mode=Mode.PRIVATE)
    cong_1_piece_14 = cong_1_piece_14a & cong_1_piece_14b
    add(cong_1_piece_14)
    with BuildSketch(Plane(origin=(-12.227502814, 0, -17.530803673), x_dir=(0.7071067811865467, 0, -0.7071067811865483), z_dir=(0.7071067811865485, 0, 0.7071067811865467))) as cong_1_piece_15a_section:
        with BuildLine():
            CenterArc((1.6, -2), CONG_1_R, 90, 53.130102354)
            Line((0, -0.8), (-0.032, -0.776))
            ThreePointArc((-0.032, -0.776), (-0.04, -0.4), (-0.04, 0))
            Line((-0.04, 0), (0, 0.04))
            Line((0, 0.04), (1.6, 0.04))
            Line((1.6, 0.04), (1.6, 0))
        make_face()
    cong_1_piece_15a = extrude(amount=9.025434204, mode=Mode.PRIVATE)
    cong_1_piece_15a = cong_1_piece_15a & Plane(origin=(0, -0.207693101, 0), x_dir=(-0.5272938729851264, 0, -0.8496829829485496), z_dir=(0, 1, 0)) * Cylinder(16.45, 25, mode=Mode.PRIVATE)
    with BuildSketch(Plane(origin=(0, 0, 0), x_dir=(-0.30719401977524424, 0, -0.9516469062705595), z_dir=(0.9516469062705595, 0, -0.30719401977524424))) as cong_1_piece_15b_section:
        with BuildLine():
            CenterArc((14.85, -2), CONG_1_R, 36.869897646, 53.130102354)
            Line((16.45, -0.8), (16.482, -0.776))
            ThreePointArc((16.482, -0.776), (16.49, -0.4), (16.49, 0))
            Line((16.49, 0), (16.45, 0.04))
            Line((16.45, 0.04), (14.85, 0.04))
            Line((14.85, 0.04), (14.85, 0))
        make_face()
    cong_1_piece_15b = revolve(axis=Axis((0, 0, 0), (0, 1, 0)), revolution_arc=54.21957961, mode=Mode.PRIVATE)
    cong_1_piece_15b = split(cong_1_piece_15b, bisect_by=Plane(origin=(-7.970374481, -0.21005361, -13.27367534), z_dir=(0.7071067811865467, 0, -0.7071067811865485)), keep=Keep.TOP, mode=Mode.PRIVATE)
    cong_1_piece_15 = cong_1_piece_15a & cong_1_piece_15b
    add(cong_1_piece_15)
    with BuildSketch(Plane(origin=(-11.148857945, 0, -5.845557086), x_dir=(-0.7071067811865459, 0, 0.7071067811865492), z_dir=(-0.7071067811865492, 0, -0.7071067811865458))) as cong_1_piece_16a_section:
        with BuildLine():
            CenterArc((1.6, -2), CONG_1_R, 90, 53.130102354)
            Line((0, -0.8), (-0.032, -0.776))
            ThreePointArc((-0.032, -0.776), (-0.04, -0.4), (-0.04, 0))
            Line((-0.04, 0), (0, 0.04))
            Line((0, 0.04), (1.6, 0.04))
            Line((1.6, 0.04), (1.6, 0))
        make_face()
    cong_1_piece_16a = extrude(amount=9.025434204, mode=Mode.PRIVATE)
    cong_1_piece_16a = cong_1_piece_16a & Plane(origin=(0, -0.207693111, 0), x_dir=(-0.5272938729851264, 0, -0.8496829829485496), z_dir=(0, 1, 0)) * Cylinder(16.45, 25, mode=Mode.PRIVATE)
    with BuildSketch(Plane(origin=(0, 0, 0), x_dir=(-0.30719401977524424, 0, -0.9516469062705595), z_dir=(0.9516469062705595, 0, -0.30719401977524424))) as cong_1_piece_16b_section:
        with BuildLine():
            CenterArc((14.85, -2), CONG_1_R, 36.869897646, 53.130102354)
            Line((16.45, -0.8), (16.482, -0.776))
            ThreePointArc((16.482, -0.776), (16.49, -0.4), (16.49, 0))
            Line((16.49, 0), (16.45, 0.04))
            Line((16.45, 0.04), (14.85, 0.04))
            Line((14.85, 0.04), (14.85, 0))
        make_face()
    cong_1_piece_16b = revolve(axis=Axis((0, 0, 0), (0, 1, 0)), revolution_arc=54.21957961, mode=Mode.PRIVATE)
    cong_1_piece_16b = split(cong_1_piece_16b, bisect_by=Plane(origin=(-13.273675532, -0.210053705, -7.970374673), z_dir=(-0.7071067811865458, 0, 0.7071067811865492)), keep=Keep.TOP, mode=Mode.PRIVATE)
    cong_1_piece_16 = cong_1_piece_16a & cong_1_piece_16b
    add(cong_1_piece_16)

    # Esquisse6 → Enlèv. mat.-Extru.3 (cut)
    with BuildSketch(Plane.XZ):
        with Locations((12.430469628, 1.379302172)):
            Rectangle(ESQUISSE6_W, ESQUISSE6_H)
    extrude(amount=-ENL_V_MAT_EXTRU_3_DEPTH, mode=Mode.SUBTRACT)

    # Esquisse7 → Enlèv. mat.-Extru.4 (cut)
    with BuildSketch(Plane.XZ):
        with Locations((0, 4)):
            Rectangle(ESQUISSE7_W, ESQUISSE7_H)
    extrude(amount=-ENL_V_MAT_EXTRU_4_DEPTH, mode=Mode.SUBTRACT)

    # Esquisse8 → Enlèv. mat.-Extru.5 (cut)
    with BuildSketch(Plane.XZ):
        with Locations((0, 16.56378264)):
            Rectangle(ESQUISSE8_W, ESQUISSE8_H)
    extrude(amount=-ENL_V_MAT_EXTRU_5_DEPTH, mode=Mode.SUBTRACT)


solid = part.part
